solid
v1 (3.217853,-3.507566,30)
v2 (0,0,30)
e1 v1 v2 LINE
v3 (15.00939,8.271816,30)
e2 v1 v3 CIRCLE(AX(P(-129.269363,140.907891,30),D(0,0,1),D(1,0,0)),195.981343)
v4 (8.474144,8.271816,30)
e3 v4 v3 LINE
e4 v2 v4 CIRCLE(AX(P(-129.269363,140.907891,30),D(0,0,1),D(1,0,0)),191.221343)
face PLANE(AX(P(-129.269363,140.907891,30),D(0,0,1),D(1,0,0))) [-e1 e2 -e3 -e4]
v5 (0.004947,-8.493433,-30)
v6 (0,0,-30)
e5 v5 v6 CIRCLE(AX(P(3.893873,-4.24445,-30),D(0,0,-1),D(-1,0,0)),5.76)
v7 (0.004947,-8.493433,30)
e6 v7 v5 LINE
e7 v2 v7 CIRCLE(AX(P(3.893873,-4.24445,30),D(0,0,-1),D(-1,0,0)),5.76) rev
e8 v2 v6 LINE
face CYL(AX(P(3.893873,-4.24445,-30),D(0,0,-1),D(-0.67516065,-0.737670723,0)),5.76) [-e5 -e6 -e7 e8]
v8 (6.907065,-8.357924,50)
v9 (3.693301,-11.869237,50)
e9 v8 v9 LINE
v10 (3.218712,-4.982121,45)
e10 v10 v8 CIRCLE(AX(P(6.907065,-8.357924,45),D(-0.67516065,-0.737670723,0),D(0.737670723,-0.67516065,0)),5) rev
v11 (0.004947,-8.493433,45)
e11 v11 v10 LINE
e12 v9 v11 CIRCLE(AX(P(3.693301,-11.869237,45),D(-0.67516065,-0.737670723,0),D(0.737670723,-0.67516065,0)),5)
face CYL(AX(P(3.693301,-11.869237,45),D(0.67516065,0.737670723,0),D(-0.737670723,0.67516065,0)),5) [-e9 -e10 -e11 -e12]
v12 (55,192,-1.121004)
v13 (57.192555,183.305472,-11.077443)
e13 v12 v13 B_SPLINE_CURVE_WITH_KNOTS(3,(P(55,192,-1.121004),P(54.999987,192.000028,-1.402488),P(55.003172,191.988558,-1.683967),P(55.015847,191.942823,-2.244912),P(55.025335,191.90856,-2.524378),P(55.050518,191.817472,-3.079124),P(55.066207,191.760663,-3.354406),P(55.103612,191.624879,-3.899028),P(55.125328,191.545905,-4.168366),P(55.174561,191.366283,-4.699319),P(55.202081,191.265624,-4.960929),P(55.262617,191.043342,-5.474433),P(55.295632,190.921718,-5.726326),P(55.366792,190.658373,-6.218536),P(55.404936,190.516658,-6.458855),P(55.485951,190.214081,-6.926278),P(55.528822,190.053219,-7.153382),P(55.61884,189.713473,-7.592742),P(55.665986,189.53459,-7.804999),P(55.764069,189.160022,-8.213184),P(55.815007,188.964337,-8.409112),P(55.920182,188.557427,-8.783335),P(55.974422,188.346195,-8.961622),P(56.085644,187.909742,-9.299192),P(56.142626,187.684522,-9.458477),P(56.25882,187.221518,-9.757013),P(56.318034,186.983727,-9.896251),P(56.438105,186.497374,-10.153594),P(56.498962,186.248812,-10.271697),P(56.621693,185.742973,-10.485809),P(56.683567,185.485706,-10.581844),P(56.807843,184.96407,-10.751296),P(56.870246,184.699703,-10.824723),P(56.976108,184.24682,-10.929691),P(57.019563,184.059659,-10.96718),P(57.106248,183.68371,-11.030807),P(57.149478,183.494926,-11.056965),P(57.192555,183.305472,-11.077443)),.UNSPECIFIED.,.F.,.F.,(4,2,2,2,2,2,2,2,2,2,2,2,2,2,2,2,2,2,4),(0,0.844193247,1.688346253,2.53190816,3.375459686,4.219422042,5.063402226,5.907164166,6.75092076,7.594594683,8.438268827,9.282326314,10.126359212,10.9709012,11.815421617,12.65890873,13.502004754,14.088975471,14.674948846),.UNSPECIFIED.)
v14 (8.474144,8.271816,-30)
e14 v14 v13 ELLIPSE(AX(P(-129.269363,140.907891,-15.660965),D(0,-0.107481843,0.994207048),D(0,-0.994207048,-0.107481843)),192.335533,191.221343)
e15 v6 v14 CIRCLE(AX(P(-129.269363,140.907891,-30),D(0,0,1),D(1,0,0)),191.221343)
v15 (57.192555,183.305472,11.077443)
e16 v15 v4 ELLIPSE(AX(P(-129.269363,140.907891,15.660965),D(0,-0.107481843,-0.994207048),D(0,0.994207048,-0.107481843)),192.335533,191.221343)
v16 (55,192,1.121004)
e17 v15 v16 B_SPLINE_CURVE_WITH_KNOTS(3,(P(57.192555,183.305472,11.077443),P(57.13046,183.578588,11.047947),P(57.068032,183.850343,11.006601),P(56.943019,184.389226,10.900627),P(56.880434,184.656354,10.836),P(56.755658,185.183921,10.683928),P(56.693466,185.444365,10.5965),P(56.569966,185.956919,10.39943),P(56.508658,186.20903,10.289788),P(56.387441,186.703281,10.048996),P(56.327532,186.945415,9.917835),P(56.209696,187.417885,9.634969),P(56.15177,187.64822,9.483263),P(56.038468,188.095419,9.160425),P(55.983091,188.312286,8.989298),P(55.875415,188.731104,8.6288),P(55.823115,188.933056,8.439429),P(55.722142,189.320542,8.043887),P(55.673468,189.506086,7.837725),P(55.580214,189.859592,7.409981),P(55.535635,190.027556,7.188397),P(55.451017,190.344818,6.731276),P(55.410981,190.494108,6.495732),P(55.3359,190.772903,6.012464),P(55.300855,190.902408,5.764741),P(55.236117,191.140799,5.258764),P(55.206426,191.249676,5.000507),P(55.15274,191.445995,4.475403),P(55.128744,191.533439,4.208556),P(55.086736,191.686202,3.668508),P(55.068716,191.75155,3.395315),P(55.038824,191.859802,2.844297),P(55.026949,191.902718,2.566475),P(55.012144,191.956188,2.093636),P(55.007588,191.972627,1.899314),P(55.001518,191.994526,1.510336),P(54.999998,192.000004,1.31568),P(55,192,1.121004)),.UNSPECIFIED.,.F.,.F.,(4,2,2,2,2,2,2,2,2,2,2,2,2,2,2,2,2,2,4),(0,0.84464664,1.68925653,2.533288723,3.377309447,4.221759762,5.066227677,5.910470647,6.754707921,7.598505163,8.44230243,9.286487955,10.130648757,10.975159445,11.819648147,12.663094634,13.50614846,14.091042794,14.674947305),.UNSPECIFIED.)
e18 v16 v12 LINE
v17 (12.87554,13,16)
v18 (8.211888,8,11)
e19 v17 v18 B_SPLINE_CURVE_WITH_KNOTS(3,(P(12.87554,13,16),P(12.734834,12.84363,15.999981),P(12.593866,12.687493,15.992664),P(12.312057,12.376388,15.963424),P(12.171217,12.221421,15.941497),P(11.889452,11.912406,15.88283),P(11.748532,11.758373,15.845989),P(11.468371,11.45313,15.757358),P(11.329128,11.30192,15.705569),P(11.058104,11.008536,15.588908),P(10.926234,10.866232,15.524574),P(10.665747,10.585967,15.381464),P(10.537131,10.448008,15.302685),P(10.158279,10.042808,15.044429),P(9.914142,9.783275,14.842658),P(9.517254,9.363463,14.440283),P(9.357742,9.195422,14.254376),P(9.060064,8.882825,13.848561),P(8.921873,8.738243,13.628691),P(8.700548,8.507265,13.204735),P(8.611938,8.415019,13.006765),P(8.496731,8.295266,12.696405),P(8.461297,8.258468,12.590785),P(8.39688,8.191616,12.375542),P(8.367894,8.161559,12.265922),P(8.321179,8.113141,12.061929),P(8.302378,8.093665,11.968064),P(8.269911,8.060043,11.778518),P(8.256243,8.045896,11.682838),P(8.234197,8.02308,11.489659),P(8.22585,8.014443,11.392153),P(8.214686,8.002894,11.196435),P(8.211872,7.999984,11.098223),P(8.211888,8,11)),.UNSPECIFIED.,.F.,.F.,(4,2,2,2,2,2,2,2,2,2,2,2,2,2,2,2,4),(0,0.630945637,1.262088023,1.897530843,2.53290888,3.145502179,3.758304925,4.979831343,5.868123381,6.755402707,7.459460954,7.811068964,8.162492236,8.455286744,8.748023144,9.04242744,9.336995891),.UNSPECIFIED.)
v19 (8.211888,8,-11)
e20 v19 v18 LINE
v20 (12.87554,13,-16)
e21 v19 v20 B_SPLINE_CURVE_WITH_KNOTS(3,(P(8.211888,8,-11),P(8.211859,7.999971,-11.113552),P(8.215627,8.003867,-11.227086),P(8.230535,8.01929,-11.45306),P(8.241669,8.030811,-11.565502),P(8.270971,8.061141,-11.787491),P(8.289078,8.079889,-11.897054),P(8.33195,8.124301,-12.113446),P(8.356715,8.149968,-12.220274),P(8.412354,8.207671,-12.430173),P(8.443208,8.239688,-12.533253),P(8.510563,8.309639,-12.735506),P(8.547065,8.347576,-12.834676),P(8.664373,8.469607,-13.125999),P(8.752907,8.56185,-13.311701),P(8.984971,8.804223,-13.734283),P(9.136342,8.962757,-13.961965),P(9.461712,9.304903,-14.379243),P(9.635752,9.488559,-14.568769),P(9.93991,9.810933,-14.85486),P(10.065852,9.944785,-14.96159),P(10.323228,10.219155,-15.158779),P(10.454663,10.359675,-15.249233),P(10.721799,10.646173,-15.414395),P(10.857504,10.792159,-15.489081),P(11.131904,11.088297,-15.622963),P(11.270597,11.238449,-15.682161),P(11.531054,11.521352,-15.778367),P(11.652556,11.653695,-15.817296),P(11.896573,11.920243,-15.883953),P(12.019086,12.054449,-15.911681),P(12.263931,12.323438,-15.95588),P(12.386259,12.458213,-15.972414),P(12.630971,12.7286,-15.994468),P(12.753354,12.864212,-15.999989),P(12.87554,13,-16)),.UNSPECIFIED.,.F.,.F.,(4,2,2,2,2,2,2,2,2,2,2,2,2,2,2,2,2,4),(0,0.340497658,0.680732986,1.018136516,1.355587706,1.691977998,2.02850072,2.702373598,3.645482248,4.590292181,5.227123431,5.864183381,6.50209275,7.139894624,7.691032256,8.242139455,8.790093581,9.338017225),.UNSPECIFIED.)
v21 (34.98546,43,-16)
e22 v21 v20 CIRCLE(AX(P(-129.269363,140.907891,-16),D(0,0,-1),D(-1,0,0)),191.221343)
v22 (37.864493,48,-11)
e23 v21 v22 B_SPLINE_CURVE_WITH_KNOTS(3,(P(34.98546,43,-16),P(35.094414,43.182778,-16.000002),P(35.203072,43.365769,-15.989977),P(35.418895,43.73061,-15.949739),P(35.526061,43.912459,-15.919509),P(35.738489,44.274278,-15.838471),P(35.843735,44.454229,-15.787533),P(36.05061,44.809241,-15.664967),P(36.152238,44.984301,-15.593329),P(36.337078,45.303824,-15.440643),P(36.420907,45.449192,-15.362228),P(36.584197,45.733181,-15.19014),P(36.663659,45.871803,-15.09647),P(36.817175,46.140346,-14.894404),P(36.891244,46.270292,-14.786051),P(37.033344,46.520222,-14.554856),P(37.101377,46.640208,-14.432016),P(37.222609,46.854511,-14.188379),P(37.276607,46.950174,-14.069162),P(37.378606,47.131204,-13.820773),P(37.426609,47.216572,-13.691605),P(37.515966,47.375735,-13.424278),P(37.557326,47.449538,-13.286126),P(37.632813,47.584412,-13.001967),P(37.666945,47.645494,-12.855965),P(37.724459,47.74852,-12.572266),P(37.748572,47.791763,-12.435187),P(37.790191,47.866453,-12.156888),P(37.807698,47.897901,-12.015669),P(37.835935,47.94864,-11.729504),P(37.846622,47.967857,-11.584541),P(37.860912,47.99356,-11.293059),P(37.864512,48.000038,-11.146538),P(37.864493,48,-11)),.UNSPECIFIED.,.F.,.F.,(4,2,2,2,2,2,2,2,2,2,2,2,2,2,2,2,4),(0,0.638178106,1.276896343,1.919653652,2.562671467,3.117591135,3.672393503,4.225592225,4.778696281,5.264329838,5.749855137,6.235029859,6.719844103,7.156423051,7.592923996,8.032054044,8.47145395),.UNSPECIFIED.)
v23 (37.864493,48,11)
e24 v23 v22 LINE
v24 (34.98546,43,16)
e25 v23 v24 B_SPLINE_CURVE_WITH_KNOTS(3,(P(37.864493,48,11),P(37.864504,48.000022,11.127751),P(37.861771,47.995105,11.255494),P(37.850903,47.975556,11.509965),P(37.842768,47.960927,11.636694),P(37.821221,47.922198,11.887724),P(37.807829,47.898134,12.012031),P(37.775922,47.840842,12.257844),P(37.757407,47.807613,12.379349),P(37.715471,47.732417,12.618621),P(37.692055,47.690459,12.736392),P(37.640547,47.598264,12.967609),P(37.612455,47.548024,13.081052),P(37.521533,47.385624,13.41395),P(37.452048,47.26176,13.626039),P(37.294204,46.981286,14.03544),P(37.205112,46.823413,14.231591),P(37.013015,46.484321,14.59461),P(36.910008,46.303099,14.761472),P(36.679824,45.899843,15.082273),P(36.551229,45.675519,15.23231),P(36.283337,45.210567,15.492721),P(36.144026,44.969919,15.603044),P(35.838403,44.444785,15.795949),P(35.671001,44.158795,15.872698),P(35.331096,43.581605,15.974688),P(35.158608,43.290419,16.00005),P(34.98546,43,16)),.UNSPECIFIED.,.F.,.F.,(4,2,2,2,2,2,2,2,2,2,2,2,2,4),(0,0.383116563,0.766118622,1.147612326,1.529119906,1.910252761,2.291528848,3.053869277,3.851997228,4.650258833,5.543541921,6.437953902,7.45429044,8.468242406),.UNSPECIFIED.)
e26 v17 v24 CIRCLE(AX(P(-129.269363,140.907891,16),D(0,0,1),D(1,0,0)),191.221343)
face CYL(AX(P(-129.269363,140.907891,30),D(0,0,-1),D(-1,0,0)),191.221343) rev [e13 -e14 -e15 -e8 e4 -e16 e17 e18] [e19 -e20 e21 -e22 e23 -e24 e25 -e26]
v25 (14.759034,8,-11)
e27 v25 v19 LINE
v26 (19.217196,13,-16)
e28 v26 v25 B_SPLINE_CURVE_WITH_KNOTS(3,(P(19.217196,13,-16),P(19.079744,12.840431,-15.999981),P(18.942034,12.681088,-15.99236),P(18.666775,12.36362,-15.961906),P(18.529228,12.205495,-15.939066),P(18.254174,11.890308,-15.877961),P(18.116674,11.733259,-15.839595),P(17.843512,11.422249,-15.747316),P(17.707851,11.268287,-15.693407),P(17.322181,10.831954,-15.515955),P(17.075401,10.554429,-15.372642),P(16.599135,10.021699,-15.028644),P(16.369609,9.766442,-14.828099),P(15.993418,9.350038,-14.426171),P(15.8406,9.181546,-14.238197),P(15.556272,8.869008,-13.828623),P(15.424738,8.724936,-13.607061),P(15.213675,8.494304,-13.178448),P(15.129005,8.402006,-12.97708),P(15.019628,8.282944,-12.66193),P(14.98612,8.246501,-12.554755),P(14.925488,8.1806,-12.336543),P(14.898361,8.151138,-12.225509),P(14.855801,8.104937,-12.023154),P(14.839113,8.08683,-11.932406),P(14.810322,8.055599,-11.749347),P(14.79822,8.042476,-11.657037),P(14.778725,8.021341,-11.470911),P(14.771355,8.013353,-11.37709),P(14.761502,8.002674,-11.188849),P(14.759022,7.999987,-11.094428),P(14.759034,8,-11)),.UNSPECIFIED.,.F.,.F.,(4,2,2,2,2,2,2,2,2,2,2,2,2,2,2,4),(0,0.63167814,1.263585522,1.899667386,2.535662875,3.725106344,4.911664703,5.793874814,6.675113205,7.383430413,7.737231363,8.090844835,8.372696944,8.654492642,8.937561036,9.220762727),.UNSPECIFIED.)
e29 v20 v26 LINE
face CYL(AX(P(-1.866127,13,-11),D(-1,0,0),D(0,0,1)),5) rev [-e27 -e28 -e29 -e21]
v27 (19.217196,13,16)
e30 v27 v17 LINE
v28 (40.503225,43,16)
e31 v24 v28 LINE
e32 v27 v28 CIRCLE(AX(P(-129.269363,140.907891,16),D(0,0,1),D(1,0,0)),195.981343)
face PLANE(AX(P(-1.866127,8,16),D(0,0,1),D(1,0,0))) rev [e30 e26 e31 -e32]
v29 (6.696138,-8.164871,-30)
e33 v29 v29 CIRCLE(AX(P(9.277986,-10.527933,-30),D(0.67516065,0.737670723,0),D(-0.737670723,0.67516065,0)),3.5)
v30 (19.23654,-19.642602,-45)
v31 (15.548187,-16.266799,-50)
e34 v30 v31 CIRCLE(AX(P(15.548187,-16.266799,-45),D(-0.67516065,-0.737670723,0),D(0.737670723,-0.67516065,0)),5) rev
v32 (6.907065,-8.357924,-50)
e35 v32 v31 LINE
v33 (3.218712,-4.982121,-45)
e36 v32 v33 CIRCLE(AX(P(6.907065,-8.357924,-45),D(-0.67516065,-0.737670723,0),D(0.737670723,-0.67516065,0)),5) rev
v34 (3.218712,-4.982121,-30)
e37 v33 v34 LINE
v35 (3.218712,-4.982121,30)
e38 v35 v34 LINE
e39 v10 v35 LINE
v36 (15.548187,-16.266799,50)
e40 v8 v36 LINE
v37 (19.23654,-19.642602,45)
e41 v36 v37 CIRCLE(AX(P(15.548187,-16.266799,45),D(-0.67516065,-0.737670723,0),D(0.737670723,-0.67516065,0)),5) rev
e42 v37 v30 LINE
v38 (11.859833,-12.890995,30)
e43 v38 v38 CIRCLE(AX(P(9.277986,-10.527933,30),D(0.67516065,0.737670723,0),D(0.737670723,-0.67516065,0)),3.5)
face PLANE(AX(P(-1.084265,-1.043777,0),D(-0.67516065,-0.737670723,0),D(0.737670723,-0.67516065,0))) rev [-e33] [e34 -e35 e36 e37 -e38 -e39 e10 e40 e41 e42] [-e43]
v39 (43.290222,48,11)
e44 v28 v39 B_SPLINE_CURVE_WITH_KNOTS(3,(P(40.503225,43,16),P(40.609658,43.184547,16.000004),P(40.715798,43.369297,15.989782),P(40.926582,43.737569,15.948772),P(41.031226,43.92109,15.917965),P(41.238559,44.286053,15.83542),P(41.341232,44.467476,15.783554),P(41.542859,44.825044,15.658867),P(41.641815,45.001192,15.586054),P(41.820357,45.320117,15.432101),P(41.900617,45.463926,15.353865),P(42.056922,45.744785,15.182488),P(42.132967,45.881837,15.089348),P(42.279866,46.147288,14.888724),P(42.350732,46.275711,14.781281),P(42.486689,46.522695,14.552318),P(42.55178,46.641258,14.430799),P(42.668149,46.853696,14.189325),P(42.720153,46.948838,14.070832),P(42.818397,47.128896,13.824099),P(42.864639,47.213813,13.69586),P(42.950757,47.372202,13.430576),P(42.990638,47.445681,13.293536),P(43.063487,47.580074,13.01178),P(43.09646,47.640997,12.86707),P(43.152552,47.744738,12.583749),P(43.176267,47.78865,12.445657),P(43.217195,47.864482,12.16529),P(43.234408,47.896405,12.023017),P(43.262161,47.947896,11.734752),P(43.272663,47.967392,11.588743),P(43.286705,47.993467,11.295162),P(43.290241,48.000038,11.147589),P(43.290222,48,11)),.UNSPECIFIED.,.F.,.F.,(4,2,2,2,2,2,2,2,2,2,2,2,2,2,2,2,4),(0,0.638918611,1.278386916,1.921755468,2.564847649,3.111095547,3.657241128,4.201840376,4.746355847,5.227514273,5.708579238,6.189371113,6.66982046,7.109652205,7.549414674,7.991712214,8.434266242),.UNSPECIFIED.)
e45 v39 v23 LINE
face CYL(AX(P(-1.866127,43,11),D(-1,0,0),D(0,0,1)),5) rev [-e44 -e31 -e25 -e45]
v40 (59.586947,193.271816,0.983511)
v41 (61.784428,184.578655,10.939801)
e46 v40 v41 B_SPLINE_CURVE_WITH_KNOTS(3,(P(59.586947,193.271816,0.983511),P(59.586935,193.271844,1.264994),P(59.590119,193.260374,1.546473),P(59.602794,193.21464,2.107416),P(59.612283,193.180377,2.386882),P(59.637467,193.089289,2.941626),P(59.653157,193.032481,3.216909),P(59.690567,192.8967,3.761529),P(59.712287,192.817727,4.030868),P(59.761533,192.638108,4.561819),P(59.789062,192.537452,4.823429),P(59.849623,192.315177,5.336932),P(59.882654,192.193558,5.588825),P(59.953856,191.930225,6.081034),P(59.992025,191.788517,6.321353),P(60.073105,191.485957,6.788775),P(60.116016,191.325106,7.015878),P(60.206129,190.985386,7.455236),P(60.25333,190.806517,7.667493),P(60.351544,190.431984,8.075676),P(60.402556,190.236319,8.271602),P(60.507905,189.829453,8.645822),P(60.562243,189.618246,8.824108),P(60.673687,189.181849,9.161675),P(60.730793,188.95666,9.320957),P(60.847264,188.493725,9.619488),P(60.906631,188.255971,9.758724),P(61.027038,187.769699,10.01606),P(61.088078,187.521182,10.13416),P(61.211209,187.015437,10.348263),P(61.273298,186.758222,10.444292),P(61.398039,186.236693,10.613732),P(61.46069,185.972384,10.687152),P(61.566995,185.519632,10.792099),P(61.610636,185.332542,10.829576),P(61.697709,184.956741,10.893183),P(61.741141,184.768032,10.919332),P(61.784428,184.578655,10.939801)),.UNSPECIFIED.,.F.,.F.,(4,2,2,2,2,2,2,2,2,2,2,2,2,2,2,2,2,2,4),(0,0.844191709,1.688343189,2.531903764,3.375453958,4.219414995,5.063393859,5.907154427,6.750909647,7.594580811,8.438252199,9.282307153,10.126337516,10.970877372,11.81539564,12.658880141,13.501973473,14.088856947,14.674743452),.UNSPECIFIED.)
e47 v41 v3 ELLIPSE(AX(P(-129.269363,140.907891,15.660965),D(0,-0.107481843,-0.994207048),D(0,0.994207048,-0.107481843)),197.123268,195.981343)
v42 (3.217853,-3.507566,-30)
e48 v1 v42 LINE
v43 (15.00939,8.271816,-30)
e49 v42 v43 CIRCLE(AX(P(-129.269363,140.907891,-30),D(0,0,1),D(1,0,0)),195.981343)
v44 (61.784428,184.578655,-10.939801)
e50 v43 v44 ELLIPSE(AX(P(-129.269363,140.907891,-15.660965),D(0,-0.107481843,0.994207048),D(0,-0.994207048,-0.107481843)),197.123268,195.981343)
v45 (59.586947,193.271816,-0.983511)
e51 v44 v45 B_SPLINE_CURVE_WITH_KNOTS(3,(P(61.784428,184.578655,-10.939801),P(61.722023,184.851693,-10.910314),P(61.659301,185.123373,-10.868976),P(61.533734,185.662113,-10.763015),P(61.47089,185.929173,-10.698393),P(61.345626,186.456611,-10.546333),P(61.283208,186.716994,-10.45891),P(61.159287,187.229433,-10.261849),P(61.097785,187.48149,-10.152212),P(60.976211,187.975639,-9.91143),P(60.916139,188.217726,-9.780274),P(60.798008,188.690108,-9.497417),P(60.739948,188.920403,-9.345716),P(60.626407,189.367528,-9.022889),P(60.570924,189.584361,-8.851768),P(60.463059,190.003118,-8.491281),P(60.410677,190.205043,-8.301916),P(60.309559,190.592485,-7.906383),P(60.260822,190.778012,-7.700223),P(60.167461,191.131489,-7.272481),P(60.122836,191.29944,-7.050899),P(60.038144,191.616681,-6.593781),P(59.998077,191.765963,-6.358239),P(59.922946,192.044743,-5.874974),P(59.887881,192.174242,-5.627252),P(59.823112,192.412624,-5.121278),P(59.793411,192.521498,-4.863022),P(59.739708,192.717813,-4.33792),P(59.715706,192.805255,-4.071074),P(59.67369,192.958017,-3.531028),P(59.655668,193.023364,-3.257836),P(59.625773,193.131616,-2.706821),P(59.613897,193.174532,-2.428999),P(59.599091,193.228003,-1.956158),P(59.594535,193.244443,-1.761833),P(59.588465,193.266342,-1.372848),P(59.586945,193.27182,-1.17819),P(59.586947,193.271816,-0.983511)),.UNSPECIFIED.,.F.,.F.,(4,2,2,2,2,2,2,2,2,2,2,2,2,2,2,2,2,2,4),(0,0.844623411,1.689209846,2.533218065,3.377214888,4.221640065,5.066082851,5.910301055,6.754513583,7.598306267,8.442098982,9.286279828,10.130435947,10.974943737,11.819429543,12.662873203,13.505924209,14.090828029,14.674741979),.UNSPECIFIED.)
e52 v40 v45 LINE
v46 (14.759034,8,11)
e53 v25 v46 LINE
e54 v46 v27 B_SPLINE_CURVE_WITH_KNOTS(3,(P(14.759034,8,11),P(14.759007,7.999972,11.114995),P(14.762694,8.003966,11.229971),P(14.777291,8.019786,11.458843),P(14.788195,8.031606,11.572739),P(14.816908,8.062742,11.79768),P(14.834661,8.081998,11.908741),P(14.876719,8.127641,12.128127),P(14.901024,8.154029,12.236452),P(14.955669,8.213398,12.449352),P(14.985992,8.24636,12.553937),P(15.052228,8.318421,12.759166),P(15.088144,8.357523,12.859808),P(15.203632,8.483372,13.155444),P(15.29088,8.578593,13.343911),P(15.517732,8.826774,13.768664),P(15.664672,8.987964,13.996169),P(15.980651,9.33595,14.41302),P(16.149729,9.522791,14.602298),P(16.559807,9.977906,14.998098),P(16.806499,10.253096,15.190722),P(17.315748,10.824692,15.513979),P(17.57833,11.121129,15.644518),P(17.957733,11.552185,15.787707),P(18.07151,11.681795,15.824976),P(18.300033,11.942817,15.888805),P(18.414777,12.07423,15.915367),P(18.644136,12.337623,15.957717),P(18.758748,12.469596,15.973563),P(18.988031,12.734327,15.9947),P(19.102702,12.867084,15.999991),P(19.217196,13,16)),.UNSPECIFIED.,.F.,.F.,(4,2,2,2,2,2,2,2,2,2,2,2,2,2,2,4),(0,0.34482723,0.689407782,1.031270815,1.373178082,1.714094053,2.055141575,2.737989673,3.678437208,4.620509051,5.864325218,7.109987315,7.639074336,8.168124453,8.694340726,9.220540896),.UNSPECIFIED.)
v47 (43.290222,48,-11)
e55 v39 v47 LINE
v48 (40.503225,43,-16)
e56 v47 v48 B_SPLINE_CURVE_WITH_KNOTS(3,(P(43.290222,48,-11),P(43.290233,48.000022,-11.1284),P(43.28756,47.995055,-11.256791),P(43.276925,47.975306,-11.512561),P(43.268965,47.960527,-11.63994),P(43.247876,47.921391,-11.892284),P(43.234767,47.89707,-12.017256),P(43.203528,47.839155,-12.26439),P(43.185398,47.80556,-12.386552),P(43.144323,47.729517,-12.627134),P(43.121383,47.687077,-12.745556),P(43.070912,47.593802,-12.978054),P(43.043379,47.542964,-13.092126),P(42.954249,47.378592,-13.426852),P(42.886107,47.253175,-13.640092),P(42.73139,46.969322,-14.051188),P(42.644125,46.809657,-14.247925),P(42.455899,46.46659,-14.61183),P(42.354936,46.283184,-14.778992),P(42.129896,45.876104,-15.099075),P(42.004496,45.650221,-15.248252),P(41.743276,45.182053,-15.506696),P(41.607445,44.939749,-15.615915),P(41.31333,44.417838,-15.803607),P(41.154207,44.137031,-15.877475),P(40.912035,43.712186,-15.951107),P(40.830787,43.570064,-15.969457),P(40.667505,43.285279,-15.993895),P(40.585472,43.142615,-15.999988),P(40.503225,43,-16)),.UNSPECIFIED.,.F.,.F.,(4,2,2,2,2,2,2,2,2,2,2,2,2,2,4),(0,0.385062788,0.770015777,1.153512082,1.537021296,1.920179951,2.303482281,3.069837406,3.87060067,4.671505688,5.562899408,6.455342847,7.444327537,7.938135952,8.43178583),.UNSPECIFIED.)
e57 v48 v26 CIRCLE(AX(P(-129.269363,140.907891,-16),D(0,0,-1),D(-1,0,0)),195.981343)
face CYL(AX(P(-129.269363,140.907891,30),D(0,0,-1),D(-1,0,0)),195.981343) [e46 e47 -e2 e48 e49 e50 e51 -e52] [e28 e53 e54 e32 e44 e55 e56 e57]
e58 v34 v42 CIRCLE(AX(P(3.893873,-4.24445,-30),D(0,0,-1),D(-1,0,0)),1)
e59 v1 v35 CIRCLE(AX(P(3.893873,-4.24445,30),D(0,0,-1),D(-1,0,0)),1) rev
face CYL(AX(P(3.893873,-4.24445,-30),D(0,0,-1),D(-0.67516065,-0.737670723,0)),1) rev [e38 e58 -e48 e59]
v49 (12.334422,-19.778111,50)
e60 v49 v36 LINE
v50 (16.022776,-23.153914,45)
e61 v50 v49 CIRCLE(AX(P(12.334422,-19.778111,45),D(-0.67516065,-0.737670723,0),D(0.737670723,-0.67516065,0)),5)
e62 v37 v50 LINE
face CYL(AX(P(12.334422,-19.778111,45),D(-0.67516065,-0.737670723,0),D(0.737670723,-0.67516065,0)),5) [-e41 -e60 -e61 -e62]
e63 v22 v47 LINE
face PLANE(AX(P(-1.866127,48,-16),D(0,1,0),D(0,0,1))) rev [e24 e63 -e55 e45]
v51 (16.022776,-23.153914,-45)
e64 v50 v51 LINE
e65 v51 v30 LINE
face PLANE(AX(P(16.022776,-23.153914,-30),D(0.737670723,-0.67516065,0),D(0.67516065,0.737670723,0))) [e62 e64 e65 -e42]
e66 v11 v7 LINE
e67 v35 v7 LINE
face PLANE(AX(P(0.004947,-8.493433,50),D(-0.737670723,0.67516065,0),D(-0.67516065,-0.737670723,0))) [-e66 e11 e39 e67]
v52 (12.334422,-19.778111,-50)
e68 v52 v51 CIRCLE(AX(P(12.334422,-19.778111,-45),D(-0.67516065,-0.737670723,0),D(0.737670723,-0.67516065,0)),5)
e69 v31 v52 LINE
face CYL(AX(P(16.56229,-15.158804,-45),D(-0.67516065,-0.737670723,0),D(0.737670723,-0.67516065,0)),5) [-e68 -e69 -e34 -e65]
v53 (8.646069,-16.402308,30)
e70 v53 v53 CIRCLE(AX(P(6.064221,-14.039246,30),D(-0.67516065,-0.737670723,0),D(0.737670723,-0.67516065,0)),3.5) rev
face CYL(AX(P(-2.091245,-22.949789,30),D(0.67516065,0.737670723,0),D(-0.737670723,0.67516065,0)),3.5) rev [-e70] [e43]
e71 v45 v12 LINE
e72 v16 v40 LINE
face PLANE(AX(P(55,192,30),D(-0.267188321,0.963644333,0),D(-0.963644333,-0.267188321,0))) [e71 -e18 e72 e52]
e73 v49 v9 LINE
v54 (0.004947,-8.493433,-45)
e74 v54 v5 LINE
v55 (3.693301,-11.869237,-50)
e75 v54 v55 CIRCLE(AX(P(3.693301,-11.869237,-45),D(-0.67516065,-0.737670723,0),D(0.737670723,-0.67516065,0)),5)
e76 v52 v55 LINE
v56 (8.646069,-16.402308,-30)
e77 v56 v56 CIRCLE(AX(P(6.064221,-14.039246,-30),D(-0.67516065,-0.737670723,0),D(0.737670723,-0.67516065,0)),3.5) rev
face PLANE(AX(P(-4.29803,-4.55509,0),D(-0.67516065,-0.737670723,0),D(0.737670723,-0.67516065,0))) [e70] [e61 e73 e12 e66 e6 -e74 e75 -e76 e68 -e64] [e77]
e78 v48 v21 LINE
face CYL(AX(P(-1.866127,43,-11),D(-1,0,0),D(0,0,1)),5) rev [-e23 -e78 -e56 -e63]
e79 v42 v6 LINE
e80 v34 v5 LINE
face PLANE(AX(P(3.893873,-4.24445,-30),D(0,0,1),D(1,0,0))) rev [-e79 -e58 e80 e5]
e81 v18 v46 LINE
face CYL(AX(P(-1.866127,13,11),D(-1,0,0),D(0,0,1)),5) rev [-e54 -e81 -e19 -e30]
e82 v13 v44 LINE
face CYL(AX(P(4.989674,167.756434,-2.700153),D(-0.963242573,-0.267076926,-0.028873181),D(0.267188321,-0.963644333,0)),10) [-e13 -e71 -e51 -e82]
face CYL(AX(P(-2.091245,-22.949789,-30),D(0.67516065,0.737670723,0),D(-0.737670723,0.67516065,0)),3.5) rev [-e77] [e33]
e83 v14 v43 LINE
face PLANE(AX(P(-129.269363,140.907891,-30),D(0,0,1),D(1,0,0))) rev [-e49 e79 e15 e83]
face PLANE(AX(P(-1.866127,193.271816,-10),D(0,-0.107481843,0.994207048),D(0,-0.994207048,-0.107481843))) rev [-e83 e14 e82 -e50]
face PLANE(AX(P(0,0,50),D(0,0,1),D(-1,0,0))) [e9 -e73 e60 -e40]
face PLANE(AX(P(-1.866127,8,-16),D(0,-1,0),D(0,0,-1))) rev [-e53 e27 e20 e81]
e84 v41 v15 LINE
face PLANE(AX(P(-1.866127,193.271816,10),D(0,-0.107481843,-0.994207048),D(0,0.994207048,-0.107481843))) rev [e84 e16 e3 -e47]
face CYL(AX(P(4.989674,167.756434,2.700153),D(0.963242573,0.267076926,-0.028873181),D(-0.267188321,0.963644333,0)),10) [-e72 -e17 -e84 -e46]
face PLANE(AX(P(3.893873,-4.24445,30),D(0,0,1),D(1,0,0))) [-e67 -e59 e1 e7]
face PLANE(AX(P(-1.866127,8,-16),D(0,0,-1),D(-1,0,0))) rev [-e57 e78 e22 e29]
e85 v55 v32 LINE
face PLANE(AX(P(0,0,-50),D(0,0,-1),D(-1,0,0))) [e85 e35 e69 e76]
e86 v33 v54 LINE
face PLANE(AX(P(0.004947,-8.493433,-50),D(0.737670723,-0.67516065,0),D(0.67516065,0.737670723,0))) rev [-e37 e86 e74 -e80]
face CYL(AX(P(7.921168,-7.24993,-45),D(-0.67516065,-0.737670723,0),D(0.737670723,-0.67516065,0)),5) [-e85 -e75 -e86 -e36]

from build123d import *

# Parameters (mm, degrees)
BRIDA_BASE1_DEPTH          = 30
BRIDA_BASE1_DEPTH_BACK     = 30
BRIDA_DE_ARISTA1_DEPTH     = 60
CORTAR_EXTRUIR4_DEPTH      = 207.650630806
CORTAR_EXTRUIR4_DEPTH_BACK = 207.650630806
CROQUIS13_W                = 32
CROQUIS13_H                = 40
REDONDEO1_R                = 10
SALIENTE_EXTRUIR1_DEPTH    = 20
REDONDEO2_R                = 5
CORTAR_EXTRUIR5_REACH      = 213.826
CROQUIS18_R                = 3.5
REDONDEO3_R                = 5


# Sheet-metal steps are written as plain solids
with BuildPart() as part:
    # Croquis2 → Brida base1 (new, two sides: drawn at the far end of the back side and taken through both)
    with BuildSketch(Plane.XY.offset(-BRIDA_BASE1_DEPTH_BACK)):
        with BuildLine():
            ThreePointArc((0, 0), (54.558363857, 88.248906187), (55, 192))
            Line((55, 192), (59.586947027, 193.271816408))
            ThreePointArc((59.586947027, 193.271816408), (59.134317403, 86.938086161), (3.217852989, -3.507566413))
            Line((3.217852989, -3.507566413), (0, 0))
        make_face()
    extrude(amount=BRIDA_BASE1_DEPTH + BRIDA_BASE1_DEPTH_BACK)

    # Brida de arista1 section (across the edge) → Brida de arista1 (add)
    with BuildSketch(Plane(origin=(2.413685543, -4.245312279, 30), x_dir=(0.6751606504214892, 0.7376707233735331, 0), z_dir=(0, 0, -1))):
        with BuildLine():
            Line((-4.76, 1.091308501), (-4.76, 22.805371535))
            Line((-4.76, 22.805371535), (0, 22.805371535))
            Line((0, 22.805371535), (0, 1.091308501))
            ThreePointArc((0, 1.091308501), (0.324409792, 0.354031164), (1.087155743, 0.095113803))
            Line((1.087155743, 0.095113803), (1.502017078, -4.64677296))
            ThreePointArc((1.502017078, -4.64677296), (-2.891399596, -3.155408959), (-4.76, 1.091308501))
        make_face()
    extrude(amount=BRIDA_DE_ARISTA1_DEPTH)

    # Croquis13 → Cortar-Extruir4 (cut, two sides: drawn at the far end of the back side and taken through both)
    with BuildSketch(Plane(origin=(0, 0, 0), x_dir=(0, 0, -1), z_dir=(1, 0, 0)).offset(-CORTAR_EXTRUIR4_DEPTH_BACK)):
        Polygon((-10, 193.271816408), (-30, 8.271816408), (-30, 193.271816408), align=None)
        Polygon((30, 193.271816408), (10, 193.271816408), (30, 8.271816408), align=None)
        with Locations((0, 28)):
            Rectangle(CROQUIS13_W, CROQUIS13_H)
    extrude(amount=CORTAR_EXTRUIR4_DEPTH + CORTAR_EXTRUIR4_DEPTH_BACK, mode=Mode.SUBTRACT)

    # Redondeo1
    redondeo1_edges = [part.edges().sort_by_distance(p)[0] for p in [
        (57.293473513, 192.635908204, 10.068746833),
        (57.293473513, 192.635908204, -10.068746833),
    ]]
    fillet(redondeo1_edges, radius=REDONDEO1_R)

    # Croquis17 → Saliente-Extruir1 (add)
    with BuildSketch(Plane(origin=(0, 0, -30), x_dir=(-1, 0, 0), z_dir=(0, 0, -1))):
        Polygon((-16.022775764, -23.1539144), (-0.004947179, -8.493433479), (-3.218711875, -4.982120836), (-19.23654046, -19.642601757), align=None)
    saliente_extruir1 = extrude(amount=SALIENTE_EXTRUIR1_DEPTH)

    # Simetría1: Saliente-Extruir1 across plane
    add(saliente_extruir1.mirror(Plane.XY))

    # Redondeo2
    redondeo2_edges = [part.edges().sort_by_distance(p)[0] for p in [
        (17.629658112, -21.398258079, -50),
        (1.611829527, -6.737777158, -50),
        (17.629658112, -21.398258079, 50),
        (1.611829527, -6.737777158, 50),
    ]]
    fillet(redondeo2_edges, radius=REDONDEO2_R)

    # Croquis18 → Cortar-Extruir5 (cut, up to next)
    with BuildSketch(Plane(origin=(-1.014102827, -1.107994025, 0), x_dir=(0, 0, -1), z_dir=(0.6751606504214892, 0.7376707233735331, 0)), mode=Mode.PRIVATE) as cortar_extruir5_sk1:
        with Locations(Location((30, -13.952144495, 0), (0, 0, 90))):
            Circle(CROQUIS18_R)
    cortar_extruir5_tool1 = extrude(cortar_extruir5_sk1.sketch, amount=-CORTAR_EXTRUIR5_REACH, mode=Mode.PRIVATE) & part.part
    # Croquis18 → Cortar-Extruir5 (cut, up to next)
    with BuildSketch(Plane(origin=(-1.014102827, -1.107994025, 0), x_dir=(0, 0, -1), z_dir=(0.6751606504214892, 0.7376707233735331, 0)), mode=Mode.PRIVATE) as cortar_extruir5_sk2:
        with Locations(Location((-30, -13.952144495, 0), (0, 0, 270))):
            Circle(CROQUIS18_R)
    cortar_extruir5_tool2 = extrude(cortar_extruir5_sk2.sketch, amount=-CORTAR_EXTRUIR5_REACH, mode=Mode.PRIVATE) & part.part
    add(cortar_extruir5_tool1.solids().sort_by_distance((9.277986, -10.527933, -30))[0], mode=Mode.SUBTRACT)
    add(cortar_extruir5_tool2.solids().sort_by_distance((9.277986, -10.527933, 30))[0], mode=Mode.SUBTRACT)

    # Redondeo3
    redondeo3_edges = [part.edges().sort_by_distance(p)[0] for p in [
        (40.577357411, 48, -16),
        (11.485461299, 8, -16),
        (11.485461299, 8, 16),
        (40.577357411, 48, 16),
    ]]
    fillet(redondeo3_edges, radius=REDONDEO3_R)


solid = part.part
